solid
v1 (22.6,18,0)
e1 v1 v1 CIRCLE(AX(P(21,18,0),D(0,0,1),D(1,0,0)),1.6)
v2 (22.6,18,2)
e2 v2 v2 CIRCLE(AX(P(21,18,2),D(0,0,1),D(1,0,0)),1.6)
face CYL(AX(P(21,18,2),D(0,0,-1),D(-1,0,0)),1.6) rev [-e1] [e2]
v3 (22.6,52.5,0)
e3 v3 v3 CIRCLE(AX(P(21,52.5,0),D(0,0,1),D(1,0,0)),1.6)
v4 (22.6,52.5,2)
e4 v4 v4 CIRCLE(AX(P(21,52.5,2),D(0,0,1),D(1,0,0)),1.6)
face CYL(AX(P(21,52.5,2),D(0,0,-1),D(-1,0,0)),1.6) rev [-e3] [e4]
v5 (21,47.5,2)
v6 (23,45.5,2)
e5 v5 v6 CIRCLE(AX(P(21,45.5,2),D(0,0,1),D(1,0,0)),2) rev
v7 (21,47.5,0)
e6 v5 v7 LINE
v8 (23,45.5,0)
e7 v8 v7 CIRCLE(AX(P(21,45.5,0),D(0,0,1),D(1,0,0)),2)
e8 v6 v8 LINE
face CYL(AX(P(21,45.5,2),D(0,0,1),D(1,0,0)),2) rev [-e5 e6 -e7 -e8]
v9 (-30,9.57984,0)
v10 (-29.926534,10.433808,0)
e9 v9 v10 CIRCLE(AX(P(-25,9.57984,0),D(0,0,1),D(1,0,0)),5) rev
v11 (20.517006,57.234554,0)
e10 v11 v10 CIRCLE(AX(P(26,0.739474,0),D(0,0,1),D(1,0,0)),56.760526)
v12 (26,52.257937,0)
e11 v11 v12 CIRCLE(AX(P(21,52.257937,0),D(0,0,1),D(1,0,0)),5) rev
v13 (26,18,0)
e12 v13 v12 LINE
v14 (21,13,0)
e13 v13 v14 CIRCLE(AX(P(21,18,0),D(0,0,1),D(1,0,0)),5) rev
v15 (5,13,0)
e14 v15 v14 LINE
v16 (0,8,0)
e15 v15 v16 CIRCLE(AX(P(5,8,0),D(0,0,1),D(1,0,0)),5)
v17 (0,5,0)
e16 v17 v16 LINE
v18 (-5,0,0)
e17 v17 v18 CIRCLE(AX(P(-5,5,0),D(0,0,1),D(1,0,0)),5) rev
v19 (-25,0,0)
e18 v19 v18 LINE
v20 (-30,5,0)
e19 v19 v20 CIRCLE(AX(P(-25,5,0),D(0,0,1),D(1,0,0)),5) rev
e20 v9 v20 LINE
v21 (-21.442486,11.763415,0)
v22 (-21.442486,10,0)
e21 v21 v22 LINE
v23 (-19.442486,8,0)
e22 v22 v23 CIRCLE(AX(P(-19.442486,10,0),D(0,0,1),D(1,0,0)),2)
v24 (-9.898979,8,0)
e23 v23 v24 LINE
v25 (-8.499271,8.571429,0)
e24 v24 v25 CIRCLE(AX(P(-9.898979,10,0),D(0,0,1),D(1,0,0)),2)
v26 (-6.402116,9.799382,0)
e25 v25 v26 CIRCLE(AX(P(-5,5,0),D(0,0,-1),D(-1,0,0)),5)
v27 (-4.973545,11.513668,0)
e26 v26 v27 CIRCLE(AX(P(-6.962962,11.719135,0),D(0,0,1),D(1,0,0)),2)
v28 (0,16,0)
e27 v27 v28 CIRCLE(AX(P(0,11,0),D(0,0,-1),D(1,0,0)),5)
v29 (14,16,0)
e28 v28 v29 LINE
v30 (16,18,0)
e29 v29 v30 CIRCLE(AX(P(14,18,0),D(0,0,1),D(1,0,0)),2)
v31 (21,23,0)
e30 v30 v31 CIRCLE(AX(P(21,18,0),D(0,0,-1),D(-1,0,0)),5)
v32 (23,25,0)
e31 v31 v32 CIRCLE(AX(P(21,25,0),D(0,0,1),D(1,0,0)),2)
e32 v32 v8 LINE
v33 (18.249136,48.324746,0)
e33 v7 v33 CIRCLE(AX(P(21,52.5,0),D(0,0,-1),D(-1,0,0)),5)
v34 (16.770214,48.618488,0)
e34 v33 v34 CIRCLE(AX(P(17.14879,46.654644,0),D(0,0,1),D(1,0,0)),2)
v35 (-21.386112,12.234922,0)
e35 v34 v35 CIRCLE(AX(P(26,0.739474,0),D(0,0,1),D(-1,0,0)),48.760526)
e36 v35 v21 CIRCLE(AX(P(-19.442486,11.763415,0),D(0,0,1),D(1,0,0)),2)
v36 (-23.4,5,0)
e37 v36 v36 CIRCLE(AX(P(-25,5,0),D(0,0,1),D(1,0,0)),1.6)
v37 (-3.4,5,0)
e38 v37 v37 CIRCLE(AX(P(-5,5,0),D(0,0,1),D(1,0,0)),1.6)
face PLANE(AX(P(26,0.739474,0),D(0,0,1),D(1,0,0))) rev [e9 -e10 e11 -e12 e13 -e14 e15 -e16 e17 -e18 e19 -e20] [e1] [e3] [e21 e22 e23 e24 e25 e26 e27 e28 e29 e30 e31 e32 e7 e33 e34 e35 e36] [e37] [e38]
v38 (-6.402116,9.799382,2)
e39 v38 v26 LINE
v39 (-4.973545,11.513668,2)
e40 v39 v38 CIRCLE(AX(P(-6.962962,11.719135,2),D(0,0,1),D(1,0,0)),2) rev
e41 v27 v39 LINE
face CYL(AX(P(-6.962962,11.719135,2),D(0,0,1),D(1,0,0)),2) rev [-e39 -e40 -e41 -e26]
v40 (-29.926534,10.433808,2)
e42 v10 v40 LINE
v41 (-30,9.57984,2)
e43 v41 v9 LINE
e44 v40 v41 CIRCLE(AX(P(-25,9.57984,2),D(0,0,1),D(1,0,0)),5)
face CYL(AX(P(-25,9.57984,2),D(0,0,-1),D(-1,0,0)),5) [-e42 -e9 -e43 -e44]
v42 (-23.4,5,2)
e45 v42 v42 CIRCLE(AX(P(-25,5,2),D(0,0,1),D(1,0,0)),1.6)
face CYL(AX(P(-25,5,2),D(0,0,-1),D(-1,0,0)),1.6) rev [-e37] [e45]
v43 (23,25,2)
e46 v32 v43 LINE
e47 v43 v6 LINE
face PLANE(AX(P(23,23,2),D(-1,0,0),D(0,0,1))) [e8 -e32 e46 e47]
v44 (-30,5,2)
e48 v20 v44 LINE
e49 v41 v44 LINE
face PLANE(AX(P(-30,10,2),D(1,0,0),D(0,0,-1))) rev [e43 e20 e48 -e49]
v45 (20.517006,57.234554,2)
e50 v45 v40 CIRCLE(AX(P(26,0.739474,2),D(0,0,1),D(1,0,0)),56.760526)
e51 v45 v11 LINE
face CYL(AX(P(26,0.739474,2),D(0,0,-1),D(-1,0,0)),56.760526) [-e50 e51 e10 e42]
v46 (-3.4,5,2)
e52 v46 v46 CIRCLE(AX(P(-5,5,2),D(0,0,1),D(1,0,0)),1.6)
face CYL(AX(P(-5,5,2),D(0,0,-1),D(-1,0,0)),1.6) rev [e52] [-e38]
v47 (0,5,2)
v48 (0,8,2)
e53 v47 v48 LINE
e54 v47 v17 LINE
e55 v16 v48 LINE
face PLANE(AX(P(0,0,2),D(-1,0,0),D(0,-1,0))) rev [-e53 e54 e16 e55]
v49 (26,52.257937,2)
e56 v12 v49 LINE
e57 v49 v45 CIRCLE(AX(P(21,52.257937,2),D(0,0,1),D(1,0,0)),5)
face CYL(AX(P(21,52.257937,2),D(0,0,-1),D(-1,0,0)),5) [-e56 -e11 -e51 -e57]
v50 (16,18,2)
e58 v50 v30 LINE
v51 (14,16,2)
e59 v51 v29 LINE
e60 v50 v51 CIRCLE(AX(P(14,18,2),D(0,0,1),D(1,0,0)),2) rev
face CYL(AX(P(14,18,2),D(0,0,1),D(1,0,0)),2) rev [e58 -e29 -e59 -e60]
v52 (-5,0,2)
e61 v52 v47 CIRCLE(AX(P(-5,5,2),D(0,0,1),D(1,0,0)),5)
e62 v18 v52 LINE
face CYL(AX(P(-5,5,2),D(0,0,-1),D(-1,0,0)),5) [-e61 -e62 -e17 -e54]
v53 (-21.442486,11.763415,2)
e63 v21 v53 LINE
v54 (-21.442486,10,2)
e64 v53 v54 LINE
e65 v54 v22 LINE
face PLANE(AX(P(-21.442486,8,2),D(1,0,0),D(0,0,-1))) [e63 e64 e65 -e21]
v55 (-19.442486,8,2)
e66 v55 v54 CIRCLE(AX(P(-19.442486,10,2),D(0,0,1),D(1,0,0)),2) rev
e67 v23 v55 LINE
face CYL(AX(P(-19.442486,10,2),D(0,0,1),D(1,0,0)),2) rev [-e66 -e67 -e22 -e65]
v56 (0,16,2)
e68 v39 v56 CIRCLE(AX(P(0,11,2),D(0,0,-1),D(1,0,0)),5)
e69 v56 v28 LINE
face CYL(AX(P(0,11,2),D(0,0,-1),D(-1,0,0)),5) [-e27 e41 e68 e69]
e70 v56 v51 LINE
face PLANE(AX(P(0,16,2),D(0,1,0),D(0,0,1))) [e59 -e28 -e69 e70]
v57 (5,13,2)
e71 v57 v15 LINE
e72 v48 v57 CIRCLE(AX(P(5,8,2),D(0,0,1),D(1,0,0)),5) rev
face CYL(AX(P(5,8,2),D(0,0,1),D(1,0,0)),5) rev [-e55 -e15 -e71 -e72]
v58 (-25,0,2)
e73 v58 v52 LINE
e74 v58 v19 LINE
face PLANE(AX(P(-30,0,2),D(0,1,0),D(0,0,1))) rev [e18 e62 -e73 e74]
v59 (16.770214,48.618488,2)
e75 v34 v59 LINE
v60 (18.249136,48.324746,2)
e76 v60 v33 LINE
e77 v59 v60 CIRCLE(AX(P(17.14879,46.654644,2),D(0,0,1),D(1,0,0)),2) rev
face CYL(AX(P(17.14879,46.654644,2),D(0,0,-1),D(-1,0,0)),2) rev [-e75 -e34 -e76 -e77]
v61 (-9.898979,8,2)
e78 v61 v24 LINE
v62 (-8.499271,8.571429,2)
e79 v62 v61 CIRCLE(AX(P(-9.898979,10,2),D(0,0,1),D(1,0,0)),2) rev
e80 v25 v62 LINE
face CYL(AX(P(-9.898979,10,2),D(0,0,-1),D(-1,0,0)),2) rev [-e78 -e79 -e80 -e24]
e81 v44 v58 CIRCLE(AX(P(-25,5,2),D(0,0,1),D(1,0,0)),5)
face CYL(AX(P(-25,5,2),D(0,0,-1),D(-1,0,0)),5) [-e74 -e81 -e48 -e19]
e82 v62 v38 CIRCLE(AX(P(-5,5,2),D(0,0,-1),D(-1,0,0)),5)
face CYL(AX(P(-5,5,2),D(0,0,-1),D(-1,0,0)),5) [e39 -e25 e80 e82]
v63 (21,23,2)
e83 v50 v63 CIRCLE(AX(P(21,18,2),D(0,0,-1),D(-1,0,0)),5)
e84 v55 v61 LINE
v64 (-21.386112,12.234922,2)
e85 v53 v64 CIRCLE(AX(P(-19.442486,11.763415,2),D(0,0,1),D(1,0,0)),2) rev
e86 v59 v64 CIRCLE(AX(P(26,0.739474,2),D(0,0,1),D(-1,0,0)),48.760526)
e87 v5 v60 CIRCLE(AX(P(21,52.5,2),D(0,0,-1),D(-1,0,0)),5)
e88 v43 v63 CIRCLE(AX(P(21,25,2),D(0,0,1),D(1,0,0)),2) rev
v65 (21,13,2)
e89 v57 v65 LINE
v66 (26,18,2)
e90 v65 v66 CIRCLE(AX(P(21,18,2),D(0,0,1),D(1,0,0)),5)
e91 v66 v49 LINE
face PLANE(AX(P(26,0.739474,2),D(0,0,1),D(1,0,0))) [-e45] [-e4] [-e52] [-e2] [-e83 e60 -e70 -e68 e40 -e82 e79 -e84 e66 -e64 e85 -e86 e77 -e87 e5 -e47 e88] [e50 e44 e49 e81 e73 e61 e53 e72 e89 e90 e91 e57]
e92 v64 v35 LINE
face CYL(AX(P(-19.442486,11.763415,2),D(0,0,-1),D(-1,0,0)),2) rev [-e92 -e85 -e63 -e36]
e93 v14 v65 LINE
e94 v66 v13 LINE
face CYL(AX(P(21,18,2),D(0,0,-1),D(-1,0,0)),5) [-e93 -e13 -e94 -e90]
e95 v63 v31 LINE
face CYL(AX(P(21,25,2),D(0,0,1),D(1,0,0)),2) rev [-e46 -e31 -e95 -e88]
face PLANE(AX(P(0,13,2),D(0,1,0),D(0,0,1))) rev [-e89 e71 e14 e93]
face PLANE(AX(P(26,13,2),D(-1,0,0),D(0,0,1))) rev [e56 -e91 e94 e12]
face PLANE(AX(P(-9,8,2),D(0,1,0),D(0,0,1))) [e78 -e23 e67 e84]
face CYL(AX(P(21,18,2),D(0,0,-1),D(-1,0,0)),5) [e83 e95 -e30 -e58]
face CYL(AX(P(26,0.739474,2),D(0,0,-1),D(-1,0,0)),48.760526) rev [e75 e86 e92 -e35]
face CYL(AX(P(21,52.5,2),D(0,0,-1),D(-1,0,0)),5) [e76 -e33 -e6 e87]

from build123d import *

# Parameters (mm, degrees)
SKETCH_1_R      = 1.6
EXTRUDE_1_DEPTH = 2
FILLET_1_R      = 5
FILLET_2_R      = 2


with BuildPart() as part:
    # ｽｹｯﾁ1 → ﾎﾞｽ - 押し出し1 (new body)
    with BuildSketch(Plane.XY):
        with BuildLine():
            Line((-30, 10), (-30, 0))
            Line((-30, 0), (0, 0))
            Line((0, 0), (0, 13))
            Line((0, 13), (26, 13))
            Line((26, 13), (26, 57.5))
            ThreePointArc((26, 57.5), (-10.715970639, 44.025670649), (-30, 10))
        make_face()
        with Locations((-25, 5)):
            Circle(SKETCH_1_R, mode=Mode.SUBTRACT)
        with Locations((-5, 5)):
            Circle(SKETCH_1_R, mode=Mode.SUBTRACT)
        with Locations((21, 18)):
            Circle(SKETCH_1_R, mode=Mode.SUBTRACT)
        with Locations((21, 52.5)):
            Circle(SKETCH_1_R, mode=Mode.SUBTRACT)
        with BuildLine():
            Line((-5, 11), (-5, 10))
            ThreePointArc((-5, 10), (-7.236067977, 9.472135955), (-9, 8))
            Line((-9, 8), (-21.442485956, 8))
            Line((-21.442485956, 8), (-21.442485956, 12))
            ThreePointArc((-21.442485956, 12), (-7.409474557, 36.255609967), (17.657876922, 48.781100521))
            ThreePointArc((17.657876922, 48.781100521), (19.210376771, 47.83124763), (21, 47.5))
            Line((21, 47.5), (23, 47.5))
            Line((23, 47.5), (23, 23))
            Line((23, 23), (21, 23))
            ThreePointArc((21, 23), (17.464466094, 21.535533906), (16, 18))
            Line((16, 18), (16, 16))
            Line((16, 16), (0, 16))
            ThreePointArc((0, 16), (-3.535533906, 14.535533906), (-5, 11))
        make_face(mode=Mode.SUBTRACT)
    extrude(amount=EXTRUDE_1_DEPTH)

    # ﾌｨﾚｯﾄ1
    fillet_1_edges = [part.edges().sort_by_distance(p)[0] for p in [
        (26, 57.5, 1),
        (26, 13, 1),
        (0, 13, 1),
        (0, 0, 1),
        (-30, 0, 1),
        (-30, 10, 1),
    ]]
    fillet(fillet_1_edges, radius=FILLET_1_R)

    # ﾌｨﾚｯﾄ2
    fillet_2_edges = [part.edges().sort_by_distance(p)[0] for p in [
        (17.657876922, 48.781100521, 1),
        (23, 47.5, 1),
        (16, 16, 1),
        (23, 23, 1),
        (-5, 10, 1),
        (-9, 8, 1),
        (-21.442485956, 8, 1),
        (-21.442485956, 12, 1),
    ]]
    fillet(fillet_2_edges, radius=FILLET_2_R - 0.0001)  # a hair under: the kernel refuses the full size


solid = part.part
